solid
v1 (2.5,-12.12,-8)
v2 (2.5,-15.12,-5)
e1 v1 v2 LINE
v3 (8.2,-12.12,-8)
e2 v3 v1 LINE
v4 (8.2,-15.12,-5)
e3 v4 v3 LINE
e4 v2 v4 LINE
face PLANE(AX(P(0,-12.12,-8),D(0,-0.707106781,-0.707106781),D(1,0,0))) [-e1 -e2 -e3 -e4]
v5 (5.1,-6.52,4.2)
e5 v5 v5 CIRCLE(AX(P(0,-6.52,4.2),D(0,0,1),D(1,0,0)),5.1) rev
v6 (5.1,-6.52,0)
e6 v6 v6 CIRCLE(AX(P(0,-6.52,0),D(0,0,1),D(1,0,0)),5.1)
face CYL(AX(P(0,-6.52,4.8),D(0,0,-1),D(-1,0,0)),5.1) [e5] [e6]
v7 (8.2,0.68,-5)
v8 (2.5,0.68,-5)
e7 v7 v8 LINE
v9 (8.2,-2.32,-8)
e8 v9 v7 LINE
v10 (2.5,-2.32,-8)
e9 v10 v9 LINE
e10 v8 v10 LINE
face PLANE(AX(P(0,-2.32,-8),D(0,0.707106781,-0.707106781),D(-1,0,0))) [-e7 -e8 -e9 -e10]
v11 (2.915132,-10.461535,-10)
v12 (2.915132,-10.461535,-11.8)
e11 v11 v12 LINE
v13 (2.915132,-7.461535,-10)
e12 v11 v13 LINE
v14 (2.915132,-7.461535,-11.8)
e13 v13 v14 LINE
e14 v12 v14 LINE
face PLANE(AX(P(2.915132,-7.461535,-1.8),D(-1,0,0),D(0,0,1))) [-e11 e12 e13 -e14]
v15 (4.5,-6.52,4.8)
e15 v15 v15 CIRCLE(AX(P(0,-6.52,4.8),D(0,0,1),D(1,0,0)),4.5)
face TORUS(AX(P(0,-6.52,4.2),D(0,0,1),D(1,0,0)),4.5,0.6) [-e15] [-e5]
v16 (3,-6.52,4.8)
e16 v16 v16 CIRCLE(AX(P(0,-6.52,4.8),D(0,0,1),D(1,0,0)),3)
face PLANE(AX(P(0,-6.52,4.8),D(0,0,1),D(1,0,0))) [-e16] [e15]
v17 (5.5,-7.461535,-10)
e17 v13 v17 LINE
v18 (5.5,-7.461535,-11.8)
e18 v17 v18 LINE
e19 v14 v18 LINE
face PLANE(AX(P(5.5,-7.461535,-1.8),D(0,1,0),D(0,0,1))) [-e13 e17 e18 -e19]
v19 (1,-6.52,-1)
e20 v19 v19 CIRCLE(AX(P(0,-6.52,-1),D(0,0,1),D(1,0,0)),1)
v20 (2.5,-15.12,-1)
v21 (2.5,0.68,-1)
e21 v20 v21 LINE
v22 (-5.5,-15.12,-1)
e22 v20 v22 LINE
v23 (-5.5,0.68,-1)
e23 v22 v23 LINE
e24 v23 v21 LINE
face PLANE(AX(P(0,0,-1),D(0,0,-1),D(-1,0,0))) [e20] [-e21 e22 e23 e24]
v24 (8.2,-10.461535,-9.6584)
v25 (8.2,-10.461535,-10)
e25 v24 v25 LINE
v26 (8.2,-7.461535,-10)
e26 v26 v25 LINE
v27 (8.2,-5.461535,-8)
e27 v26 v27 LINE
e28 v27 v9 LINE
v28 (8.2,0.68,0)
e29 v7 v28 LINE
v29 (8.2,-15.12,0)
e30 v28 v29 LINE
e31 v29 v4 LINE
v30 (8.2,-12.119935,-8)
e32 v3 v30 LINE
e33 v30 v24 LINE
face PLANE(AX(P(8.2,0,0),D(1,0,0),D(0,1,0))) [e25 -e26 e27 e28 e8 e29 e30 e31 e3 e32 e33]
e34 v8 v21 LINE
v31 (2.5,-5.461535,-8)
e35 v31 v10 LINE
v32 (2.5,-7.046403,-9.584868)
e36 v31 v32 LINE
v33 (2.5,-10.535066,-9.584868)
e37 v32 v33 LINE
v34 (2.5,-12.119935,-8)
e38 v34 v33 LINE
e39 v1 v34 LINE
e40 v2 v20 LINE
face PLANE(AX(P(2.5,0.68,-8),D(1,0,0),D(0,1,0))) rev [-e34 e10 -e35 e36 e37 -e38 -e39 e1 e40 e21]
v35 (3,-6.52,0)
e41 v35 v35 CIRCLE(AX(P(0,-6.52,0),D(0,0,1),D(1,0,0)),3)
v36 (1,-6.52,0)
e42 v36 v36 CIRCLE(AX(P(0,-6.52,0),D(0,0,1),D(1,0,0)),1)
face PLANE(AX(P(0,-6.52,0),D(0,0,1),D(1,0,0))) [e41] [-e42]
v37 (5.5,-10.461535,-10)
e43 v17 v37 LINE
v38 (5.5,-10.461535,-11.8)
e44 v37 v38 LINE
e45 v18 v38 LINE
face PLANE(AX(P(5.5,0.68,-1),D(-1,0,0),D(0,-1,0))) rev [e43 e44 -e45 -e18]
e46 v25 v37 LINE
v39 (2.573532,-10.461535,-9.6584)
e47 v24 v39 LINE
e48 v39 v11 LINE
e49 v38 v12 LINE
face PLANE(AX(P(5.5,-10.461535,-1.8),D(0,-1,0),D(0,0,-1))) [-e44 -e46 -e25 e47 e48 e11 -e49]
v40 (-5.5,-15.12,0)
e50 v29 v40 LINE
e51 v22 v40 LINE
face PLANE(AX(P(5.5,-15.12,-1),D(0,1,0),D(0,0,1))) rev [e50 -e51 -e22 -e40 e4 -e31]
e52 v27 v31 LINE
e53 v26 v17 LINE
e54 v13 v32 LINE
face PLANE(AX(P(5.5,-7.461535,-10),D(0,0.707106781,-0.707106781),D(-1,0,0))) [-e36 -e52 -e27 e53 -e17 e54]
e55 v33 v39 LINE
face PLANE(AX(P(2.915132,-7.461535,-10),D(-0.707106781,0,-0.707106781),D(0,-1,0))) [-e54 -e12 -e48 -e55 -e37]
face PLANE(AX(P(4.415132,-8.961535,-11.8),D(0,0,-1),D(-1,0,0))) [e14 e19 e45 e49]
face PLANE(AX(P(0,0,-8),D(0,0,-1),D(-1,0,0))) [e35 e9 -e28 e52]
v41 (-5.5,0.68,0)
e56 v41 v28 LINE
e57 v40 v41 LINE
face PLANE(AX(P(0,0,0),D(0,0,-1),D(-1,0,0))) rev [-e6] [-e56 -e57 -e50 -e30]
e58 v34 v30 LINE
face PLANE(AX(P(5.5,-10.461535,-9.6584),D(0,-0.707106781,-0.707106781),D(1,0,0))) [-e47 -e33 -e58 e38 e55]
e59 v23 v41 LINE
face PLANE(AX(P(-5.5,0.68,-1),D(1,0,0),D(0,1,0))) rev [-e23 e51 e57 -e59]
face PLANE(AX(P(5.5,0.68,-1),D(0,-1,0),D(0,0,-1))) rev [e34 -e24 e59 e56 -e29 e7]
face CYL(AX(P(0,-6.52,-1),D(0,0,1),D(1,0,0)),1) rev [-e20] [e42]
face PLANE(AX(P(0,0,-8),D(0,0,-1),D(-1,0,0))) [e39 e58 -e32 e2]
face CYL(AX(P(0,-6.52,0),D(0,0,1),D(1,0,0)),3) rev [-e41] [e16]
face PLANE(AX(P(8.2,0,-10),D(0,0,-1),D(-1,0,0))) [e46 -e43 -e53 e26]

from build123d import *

# Parameters (mm, degrees)
SKETCH_3_R          = 5.1
EXTRUDE_1_DEPTH     = 4.8
SKETCH_4_W          = 11
SKETCH_4_H          = 15.8
EXTRUDE_2_DEPTH     = 1
SKETCH_5_R          = 1.5
EXTRUDE_3_DEPTH     = 10.8
CUT_EXTRUDE_1_DEPTH = 10.8
FILLET_1_R          = 0.6
SKETCH_8_R          = 3
CUT_EXTRUDE_2_DEPTH = 4.8
SKETCH_9_R          = 1
CUT_EXTRUDE_3_DEPTH = 1
SKETCH_10_W         = 3
SKETCH_10_H         = 15.8
EXTRUDE_4_DEPTH     = 7
CHAMFER_1_SIZE      = 3
SKETCH_11_W         = 2.584868303
SKETCH_11_H         = 3
EXTRUDE_5_DEPTH     = 10
CHAMFER_4_SIZE      = 1.6584
CHAMFER_5_SIZE      = 2
CHAMFER_6_SIZE      = 2
EXTRUDE_6_DEPTH     = 2.7


# Read off the part's stored shape, not the designer's step: Бобышка-Вытянуть6
with BuildPart() as part:
    # Эскиз3 → Бобышка-Вытянуть1 (new body)
    with BuildSketch(Plane.XY):
        with Locations((0, -6.52)):
            Circle(SKETCH_3_R)
    extrude(amount=EXTRUDE_1_DEPTH)

    # Эскиз4 → Бобышка-Вытянуть2 (add)
    with BuildSketch(Plane(origin=(0, 0, 0), x_dir=(-1, 0, 0), z_dir=(0, 0, -1))):
        with Locations((0, -7.22)):
            Rectangle(SKETCH_4_W, SKETCH_4_H)
    extrude(amount=EXTRUDE_2_DEPTH)

    # Эскиз5 → Бобышка-Вытянуть3 (add)
    with BuildSketch(Plane(origin=(0, 0, -1), x_dir=(-1, 0, 0), z_dir=(0, 0, -1))):
        with Locations(Location((-4.415131697, -8.961534596, 0), (0, 0, 136.323092078))):
            Circle(SKETCH_5_R)
    extrude(amount=EXTRUDE_3_DEPTH)

    # Эскиз6 → Вырез-Вытянуть1 (cut)
    with BuildSketch(Plane.XY.offset(-1)):
        with BuildLine():
            Line((5.5, -7.925648132), (5.5, -9.997421059))
            ThreePointArc((5.5, -9.997421059), (5.915131697, -8.961534596), (5.5, -7.925648132))
        make_face()
    extrude(amount=-CUT_EXTRUDE_1_DEPTH, mode=Mode.SUBTRACT)

    # Скругление1
    fillet_1_edges = [part.edges().sort_by_distance(p)[0] for p in [
        (-5.1, -6.52, 4.8),
    ]]
    fillet(fillet_1_edges, radius=FILLET_1_R)

    # Эскиз8 → Вырез-Вытянуть2 (cut)
    with BuildSketch(Plane.XY.offset(4.8)):
        with Locations((0, -6.52)):
            Circle(SKETCH_8_R)
    extrude(amount=-CUT_EXTRUDE_2_DEPTH, mode=Mode.SUBTRACT)

    # Эскиз9 → Вырез-Вытянуть3 (cut)
    with BuildSketch(Plane.XY):
        with Locations((0, -6.52)):
            Circle(SKETCH_9_R)
    extrude(amount=-CUT_EXTRUDE_3_DEPTH, mode=Mode.SUBTRACT)

    # Эскиз10 → Бобышка-Вытянуть4 (add)
    with BuildSketch(Plane(origin=(0, 0, -1), x_dir=(-1, 0, 0), z_dir=(0, 0, -1))):
        with Locations((-4, -7.22)):
            Rectangle(SKETCH_10_W, SKETCH_10_H)
    extrude(amount=EXTRUDE_4_DEPTH)

    # Фаска1
    chamfer_1_edges = [part.edges().sort_by_distance(p)[0] for p in [
        (4, -15.12, -8),
        (4, 0.68, -8),
    ]]
    chamfer(chamfer_1_edges, length=CHAMFER_1_SIZE)

    # Эскиз11 → Бобышка-Вытянуть5 (add)
    with BuildSketch(Plane(origin=(0, 0, -11.8), x_dir=(-1, 0, 0), z_dir=(0, 0, -1))):
        with Locations((-4.207565848, -8.961534596)):
            Rectangle(SKETCH_11_W, SKETCH_11_H)
    extrude(amount=-EXTRUDE_5_DEPTH)

    # Фаска4
    chamfer_4_edges = [part.edges().sort_by_distance(p)[0] for p in [
        (4.207565848, -10.461534596, -8),
    ]]
    chamfer(chamfer_4_edges, length=CHAMFER_4_SIZE)

    # Фаска5
    chamfer_5_edges = [part.edges().sort_by_distance(p)[0] for p in [
        (4.207565848, -7.461534596, -8),
    ]]
    chamfer(chamfer_5_edges, length=CHAMFER_5_SIZE)

    # Фаска6
    # the kernel refuses this chamfer: 2 mm, written as the material it adds along each edge
    with BuildSketch(Plane(origin=(2.915131697, -0.31816862, -8), x_dir=(-0.9996219169112968, 0, 0.027495876610586487), z_dir=(0, -1, 0))) as chamfer_6_piece_1_section:
        Polygon((CHAMFER_6_SIZE * 0.999621916911, CHAMFER_6_SIZE * 0.0274958766106), (-CHAMFER_6_SIZE * 0.0274958766106, CHAMFER_6_SIZE * 0.999621916911), (0, 0), align=None)
    chamfer_6_piece_1 = extrude(amount=16.945131952, mode=Mode.PRIVATE)
    chamfer_6_piece_1 = split(chamfer_6_piece_1, bisect_by=Plane(origin=(2.709078012, -6.449232398, -8.987697802), z_dir=(0, -0.7071067811865476, 0.7071067811865476)), keep=Keep.TOP, mode=Mode.PRIVATE)
    chamfer_6_piece_1 = split(chamfer_6_piece_1, bisect_by=Plane(origin=(2.709078012, -10.461534596, -8.650263736), z_dir=(0, 1, 0)), keep=Keep.TOP, mode=Mode.PRIVATE)
    chamfer_6_piece_1 = split(chamfer_6_piece_1, bisect_by=Plane(origin=(2.5, -6.786666464, -8.650263736), z_dir=(1, 0, 0)), keep=Keep.TOP, mode=Mode.PRIVATE)
    add(chamfer_6_piece_1)
    with BuildSketch(Plane(origin=(2.915131697, -0.31816862, -8), x_dir=(-0.9996219169112968, 0, 0.027495876610586487), z_dir=(0, -1, 0))) as chamfer_6_piece_2_section:
        Polygon((CHAMFER_6_SIZE * 0.999621916911, CHAMFER_6_SIZE * 0.0274958766106), (-CHAMFER_6_SIZE * 0.0274958766106, CHAMFER_6_SIZE * 0.999621916911), (0, 0), align=None)
    chamfer_6_piece_2 = extrude(amount=16.945131952, mode=Mode.PRIVATE)
    chamfer_6_piece_2 = split(chamfer_6_piece_2, bisect_by=Plane(origin=(2.70758781, -10.461534596, -8.552675921), z_dir=(0, -1, 0)), keep=Keep.TOP, mode=Mode.PRIVATE)
    chamfer_6_piece_2 = split(chamfer_6_piece_2, bisect_by=Plane(origin=(2.70758781, -11.290827655, -8.829106941), z_dir=(0, 0.7071067811865476, 0.7071067811865476)), keep=Keep.TOP, mode=Mode.PRIVATE)
    chamfer_6_piece_2 = split(chamfer_6_piece_2, bisect_by=Plane(origin=(2.5, -11.014396635, -8.552675921), z_dir=(1, 0, 0)), keep=Keep.TOP, mode=Mode.PRIVATE)
    add(chamfer_6_piece_2)

    # Бобышка-Вытянуть6 outline → Бобышка-Вытянуть6 (add)
    with BuildSketch(Plane(origin=(5.5, 0, 0), x_dir=(0, 0, -1), z_dir=(1, 0, 0))):
        Polygon((10, -7.461534596), (8, -5.461534596), (8, -2.32), (5, 0.68), (0, 0.68), (0, -15.12), (5, -15.12), (8, -12.12), (9.6584, -10.461534596), (10, -10.461534596), align=None)
    extrude(amount=EXTRUDE_6_DEPTH)


solid = part.part
